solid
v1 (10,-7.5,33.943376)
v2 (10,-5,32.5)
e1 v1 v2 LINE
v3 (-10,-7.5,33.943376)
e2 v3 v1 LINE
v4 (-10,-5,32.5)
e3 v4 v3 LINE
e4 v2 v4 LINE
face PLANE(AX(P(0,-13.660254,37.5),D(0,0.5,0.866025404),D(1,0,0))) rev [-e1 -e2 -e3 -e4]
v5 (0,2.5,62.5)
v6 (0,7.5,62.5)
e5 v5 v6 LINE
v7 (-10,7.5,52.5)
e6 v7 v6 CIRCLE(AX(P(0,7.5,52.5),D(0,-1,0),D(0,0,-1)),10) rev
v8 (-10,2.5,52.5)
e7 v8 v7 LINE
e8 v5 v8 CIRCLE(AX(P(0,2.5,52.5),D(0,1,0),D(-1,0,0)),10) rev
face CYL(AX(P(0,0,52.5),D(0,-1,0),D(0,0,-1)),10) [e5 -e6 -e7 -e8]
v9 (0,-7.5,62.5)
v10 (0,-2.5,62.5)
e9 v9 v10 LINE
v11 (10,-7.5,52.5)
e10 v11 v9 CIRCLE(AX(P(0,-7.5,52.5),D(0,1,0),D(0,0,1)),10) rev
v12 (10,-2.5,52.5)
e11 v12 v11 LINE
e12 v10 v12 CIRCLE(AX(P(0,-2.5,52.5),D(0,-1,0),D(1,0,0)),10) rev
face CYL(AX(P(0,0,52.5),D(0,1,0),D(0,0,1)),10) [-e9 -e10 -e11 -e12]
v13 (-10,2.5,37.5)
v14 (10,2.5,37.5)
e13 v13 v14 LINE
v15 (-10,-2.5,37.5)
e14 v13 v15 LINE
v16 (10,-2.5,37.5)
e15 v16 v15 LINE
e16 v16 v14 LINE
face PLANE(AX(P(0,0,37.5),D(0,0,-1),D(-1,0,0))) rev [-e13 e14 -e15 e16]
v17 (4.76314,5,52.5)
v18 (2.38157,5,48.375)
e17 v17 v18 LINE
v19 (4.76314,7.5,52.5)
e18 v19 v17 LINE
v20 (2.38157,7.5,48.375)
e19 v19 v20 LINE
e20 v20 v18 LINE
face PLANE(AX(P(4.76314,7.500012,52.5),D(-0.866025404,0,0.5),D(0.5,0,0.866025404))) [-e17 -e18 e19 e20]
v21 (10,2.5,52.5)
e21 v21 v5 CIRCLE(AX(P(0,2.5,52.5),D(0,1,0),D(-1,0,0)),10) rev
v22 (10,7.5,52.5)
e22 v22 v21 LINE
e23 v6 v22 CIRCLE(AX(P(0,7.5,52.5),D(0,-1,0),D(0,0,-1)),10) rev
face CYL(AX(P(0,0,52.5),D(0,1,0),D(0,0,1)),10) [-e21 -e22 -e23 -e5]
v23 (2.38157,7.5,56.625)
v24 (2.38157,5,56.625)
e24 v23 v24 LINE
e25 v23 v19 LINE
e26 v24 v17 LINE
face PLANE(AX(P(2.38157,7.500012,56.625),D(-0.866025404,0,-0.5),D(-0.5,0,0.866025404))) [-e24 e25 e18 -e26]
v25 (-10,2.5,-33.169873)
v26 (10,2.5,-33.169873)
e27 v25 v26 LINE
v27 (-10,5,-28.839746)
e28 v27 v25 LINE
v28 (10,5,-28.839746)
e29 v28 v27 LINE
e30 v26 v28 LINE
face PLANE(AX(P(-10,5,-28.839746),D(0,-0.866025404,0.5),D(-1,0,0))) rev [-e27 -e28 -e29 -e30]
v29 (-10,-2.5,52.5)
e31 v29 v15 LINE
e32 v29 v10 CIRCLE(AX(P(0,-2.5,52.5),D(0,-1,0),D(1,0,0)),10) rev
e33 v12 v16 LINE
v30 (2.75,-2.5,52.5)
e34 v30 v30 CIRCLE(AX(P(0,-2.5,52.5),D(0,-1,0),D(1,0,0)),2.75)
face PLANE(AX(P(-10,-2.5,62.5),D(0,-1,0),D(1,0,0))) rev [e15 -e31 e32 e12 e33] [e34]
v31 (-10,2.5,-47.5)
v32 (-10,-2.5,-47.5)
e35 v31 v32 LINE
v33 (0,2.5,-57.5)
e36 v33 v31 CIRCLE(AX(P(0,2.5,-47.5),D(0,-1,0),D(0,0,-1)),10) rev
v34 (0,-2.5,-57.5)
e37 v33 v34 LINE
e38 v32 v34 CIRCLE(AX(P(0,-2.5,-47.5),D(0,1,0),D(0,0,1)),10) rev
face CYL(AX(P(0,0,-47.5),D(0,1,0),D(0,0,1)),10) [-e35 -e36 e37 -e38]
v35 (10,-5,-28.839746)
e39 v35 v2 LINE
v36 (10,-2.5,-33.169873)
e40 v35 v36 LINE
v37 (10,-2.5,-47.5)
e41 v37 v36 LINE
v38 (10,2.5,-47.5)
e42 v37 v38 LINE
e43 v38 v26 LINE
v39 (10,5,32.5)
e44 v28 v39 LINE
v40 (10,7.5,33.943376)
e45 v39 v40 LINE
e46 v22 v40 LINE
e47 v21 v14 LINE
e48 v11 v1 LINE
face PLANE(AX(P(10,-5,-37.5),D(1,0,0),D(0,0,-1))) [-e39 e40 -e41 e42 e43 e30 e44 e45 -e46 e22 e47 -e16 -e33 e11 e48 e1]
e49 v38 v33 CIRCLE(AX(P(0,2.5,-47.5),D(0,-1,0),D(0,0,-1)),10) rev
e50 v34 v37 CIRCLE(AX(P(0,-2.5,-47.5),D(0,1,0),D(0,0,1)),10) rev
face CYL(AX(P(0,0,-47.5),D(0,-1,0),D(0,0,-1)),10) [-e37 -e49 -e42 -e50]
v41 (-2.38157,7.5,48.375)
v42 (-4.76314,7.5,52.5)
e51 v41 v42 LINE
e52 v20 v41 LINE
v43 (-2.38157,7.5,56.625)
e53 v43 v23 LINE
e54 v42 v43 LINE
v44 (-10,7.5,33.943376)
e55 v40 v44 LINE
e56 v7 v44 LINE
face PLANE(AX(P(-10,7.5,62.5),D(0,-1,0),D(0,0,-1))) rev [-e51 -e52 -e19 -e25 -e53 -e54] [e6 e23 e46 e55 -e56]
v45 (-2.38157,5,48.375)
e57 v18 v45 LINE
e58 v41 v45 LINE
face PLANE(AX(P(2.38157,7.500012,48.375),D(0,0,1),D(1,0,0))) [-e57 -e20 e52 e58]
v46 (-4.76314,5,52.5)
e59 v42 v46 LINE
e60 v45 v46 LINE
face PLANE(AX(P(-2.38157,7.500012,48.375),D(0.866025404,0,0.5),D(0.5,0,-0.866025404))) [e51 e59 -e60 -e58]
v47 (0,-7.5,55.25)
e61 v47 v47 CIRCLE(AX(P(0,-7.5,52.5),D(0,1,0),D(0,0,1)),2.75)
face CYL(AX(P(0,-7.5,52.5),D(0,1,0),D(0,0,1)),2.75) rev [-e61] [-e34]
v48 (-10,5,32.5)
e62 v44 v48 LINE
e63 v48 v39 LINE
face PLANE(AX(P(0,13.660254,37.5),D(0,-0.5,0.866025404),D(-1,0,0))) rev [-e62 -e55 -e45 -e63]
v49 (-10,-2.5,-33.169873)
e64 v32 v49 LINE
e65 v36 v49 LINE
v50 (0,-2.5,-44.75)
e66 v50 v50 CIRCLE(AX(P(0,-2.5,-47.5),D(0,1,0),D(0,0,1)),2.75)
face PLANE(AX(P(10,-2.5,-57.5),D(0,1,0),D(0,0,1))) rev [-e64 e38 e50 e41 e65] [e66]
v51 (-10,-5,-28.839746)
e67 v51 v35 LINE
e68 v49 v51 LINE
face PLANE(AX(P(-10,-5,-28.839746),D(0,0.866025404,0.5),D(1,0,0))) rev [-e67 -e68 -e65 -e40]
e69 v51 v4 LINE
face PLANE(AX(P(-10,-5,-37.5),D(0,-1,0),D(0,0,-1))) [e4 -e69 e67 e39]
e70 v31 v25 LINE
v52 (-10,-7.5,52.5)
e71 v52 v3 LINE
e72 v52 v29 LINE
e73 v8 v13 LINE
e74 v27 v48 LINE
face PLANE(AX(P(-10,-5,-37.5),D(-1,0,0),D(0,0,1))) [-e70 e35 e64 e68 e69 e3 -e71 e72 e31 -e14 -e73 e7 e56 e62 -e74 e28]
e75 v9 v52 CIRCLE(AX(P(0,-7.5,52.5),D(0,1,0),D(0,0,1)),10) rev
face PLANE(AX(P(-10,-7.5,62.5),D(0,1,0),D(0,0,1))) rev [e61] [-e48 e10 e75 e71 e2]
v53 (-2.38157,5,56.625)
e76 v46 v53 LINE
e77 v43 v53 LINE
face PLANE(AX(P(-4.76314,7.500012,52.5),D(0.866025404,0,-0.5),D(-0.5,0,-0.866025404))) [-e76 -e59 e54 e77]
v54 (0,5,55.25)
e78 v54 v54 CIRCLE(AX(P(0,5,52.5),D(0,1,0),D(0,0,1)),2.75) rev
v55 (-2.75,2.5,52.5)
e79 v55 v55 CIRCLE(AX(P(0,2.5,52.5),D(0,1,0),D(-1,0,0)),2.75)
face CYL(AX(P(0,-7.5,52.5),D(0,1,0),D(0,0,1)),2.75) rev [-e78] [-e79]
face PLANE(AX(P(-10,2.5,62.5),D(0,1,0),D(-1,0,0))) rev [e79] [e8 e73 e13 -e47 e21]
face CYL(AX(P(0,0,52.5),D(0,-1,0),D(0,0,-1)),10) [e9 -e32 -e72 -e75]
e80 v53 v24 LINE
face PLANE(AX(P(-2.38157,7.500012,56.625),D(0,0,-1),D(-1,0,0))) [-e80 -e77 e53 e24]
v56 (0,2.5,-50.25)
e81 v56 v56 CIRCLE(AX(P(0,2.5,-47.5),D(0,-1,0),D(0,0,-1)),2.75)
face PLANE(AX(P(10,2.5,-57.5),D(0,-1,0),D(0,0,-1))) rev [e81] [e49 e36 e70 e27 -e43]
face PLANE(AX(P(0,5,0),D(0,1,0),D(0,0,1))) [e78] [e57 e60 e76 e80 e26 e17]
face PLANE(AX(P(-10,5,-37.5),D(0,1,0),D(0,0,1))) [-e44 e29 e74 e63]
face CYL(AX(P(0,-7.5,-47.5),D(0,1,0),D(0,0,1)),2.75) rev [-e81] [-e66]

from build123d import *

# Parameters (mm, degrees)
BOSS_EXTRUDE1_DEPTH      = 37.5
BOSS_EXTRUDE1_DEPTH_BACK = 37.5
SKETCH1_W                = 20
SKETCH1_H                = 10
SKETCH3_W                = 20
SKETCH3_H                = 5
BOSS_EXTRUDE2_DEPTH      = 20
FILLET1_R                = 10
SKETCH5_W                = 20
SKETCH5_H                = 5
BOSS_EXTRUDE3_DEPTH      = 25
CHAMFER1_SIZE            = 5
CHAMFER1_SIZE_2          = 8.660254038
FILLET2_R                = 10
CUT_EXTRUDE1_DEPTH       = 65.08002809
CUT_EXTRUDE1_DEPTH_BACK  = 65.08002809
SKETCH4_R                = 2.75
CUT_EXTRUDE2_DEPTH       = 66.048059156
CUT_EXTRUDE2_DEPTH_BACK  = 2.5


# Some blends are built 0.0001 mm under size
with BuildPart() as part:
    # Sketch1 → Boss-Extrude1 (new, two sides: drawn at the far end of the back side and taken through both)
    with BuildSketch(Plane.XY.offset(-BOSS_EXTRUDE1_DEPTH_BACK)):
        Rectangle(SKETCH1_W, SKETCH1_H)
    extrude(amount=BOSS_EXTRUDE1_DEPTH + BOSS_EXTRUDE1_DEPTH_BACK)

    # Sketch3 → Boss-Extrude2 (add)
    with BuildSketch(Plane(origin=(0, 0, -37.5), x_dir=(-1, 0, 0), z_dir=(0, 0, -1))):
        Rectangle(SKETCH3_W, SKETCH3_H)
    extrude(amount=BOSS_EXTRUDE2_DEPTH)

    # Fillet1
    fillet1_edges = [part.edges().sort_by_distance(p)[0] for p in [
        (-10, 0, -57.5),
        (10, 0, -57.5),
    ]]
    fillet(fillet1_edges, radius=FILLET1_R - 0.0001)  # a hair under: the kernel refuses the full size

    # Sketch5 → Boss-Extrude3 (add)
    with BuildSketch(Plane.XY.offset(37.5)):
        with Locations((0, 5)):
            Rectangle(SKETCH5_W, SKETCH5_H)
        with Locations((0, -5)):
            Rectangle(SKETCH5_W, SKETCH5_H)
    extrude(amount=BOSS_EXTRUDE3_DEPTH)

    # Chamfer1
    # the kernel refuses this chamfer: 8.660254038, 5 mm, written as the material it adds along each edge
    with BuildSketch(Plane(origin=(10, 5, 37.5), x_dir=(0, -0.05789386240267149, -0.9983227437537926), z_dir=(-1, 0, 0))) as chamfer1_piece_1_section:
        Polygon((CHAMFER1_SIZE * 0.998322743754, -CHAMFER1_SIZE * 0.0578938624027), (-CHAMFER1_SIZE_2 * 0.0578938624016, -CHAMFER1_SIZE_2 * 0.998322743736), (0, 0), align=None)
    chamfer1_piece_1 = extrude(amount=20, mode=Mode.PRIVATE)
    chamfer1_piece_1 = split(chamfer1_piece_1, bisect_by=Plane(origin=(0, 7.5, 35.327003025), z_dir=(0, -1, 0)), keep=Keep.TOP, mode=Mode.PRIVATE)
    add(chamfer1_piece_1)
    with BuildSketch(Plane(origin=(-10, -5, 37.5), x_dir=(0, 0.05789386240267149, -0.9983227437537926), z_dir=(1, 0, 0))) as chamfer1_piece_2_section:
        Polygon((CHAMFER1_SIZE * 0.998322743754, -CHAMFER1_SIZE * 0.0578938624027), (-CHAMFER1_SIZE_2 * 0.0578938624016, -CHAMFER1_SIZE_2 * 0.998322743736), (0, 0), align=None)
    chamfer1_piece_2 = extrude(amount=20, mode=Mode.PRIVATE)
    chamfer1_piece_2 = split(chamfer1_piece_2, bisect_by=Plane(origin=(0, -7.5, 35.327003025), z_dir=(0, 1, 0)), keep=Keep.TOP, mode=Mode.PRIVATE)
    add(chamfer1_piece_2)
    # the kernel refuses this chamfer: 8.660254038, 5 mm, written as the material it takes off along each edge
    with BuildSketch(Plane(origin=(32.404819853, 5, -37.5), x_dir=(0, 0.019326765612700598, 0.9998132206222078), z_dir=(-1, 0, 0))) as chamfer1_2_piece_1_section:
        Polygon((CHAMFER1_SIZE_2 * 0.999813220604, -CHAMFER1_SIZE_2 * 0.0193267656124), (-CHAMFER1_SIZE * 0.0193267656127, -CHAMFER1_SIZE * 0.999813220622), (0, 0), align=None)
    chamfer1_2_piece_1 = extrude(amount=64.809639706, mode=Mode.PRIVATE)
    chamfer1_2_piece_1 = split(chamfer1_2_piece_1, bisect_by=Plane(origin=(0, 2.5, -34.039331058), z_dir=(0, 1, 0)), keep=Keep.TOP, mode=Mode.PRIVATE)
    add(chamfer1_2_piece_1, mode=Mode.SUBTRACT)
    with BuildSketch(Plane(origin=(-32.404819853, -5, -37.5), x_dir=(0, 0.9983227437537926, -0.057893862402671824), z_dir=(1, 0, 0))) as chamfer1_2_piece_2_section:
        Polygon((CHAMFER1_SIZE * 0.998322743754, CHAMFER1_SIZE * 0.0578938624027), (-CHAMFER1_SIZE_2 * 0.0578938624016, CHAMFER1_SIZE_2 * 0.998322743736), (0, 0), align=None)
    chamfer1_2_piece_2 = extrude(amount=64.809639706, mode=Mode.PRIVATE)
    chamfer1_2_piece_2 = split(chamfer1_2_piece_2, bisect_by=Plane(origin=(0, -2.5, -34.039331058), z_dir=(0, -1, 0)), keep=Keep.TOP, mode=Mode.PRIVATE)
    add(chamfer1_2_piece_2, mode=Mode.SUBTRACT)

    # Fillet2
    fillet2_edges = [part.edges().sort_by_distance(p)[0] for p in [
        (-10, -5, 62.5),
        (-10, 5, 62.5),
        (10, -5, 62.5),
        (10, 5, 62.5),
    ]]
    fillet(fillet2_edges, radius=FILLET2_R - 0.0001)  # a hair under: the kernel refuses the full size

    # Sketch4 → Cut-Extrude1 (cut, two sides: drawn at the far end of the back side and taken through both)
    with BuildSketch(Plane(origin=(0, 2.5, 0), x_dir=(1, 0, 0), z_dir=(0, 1, 0)).offset(-CUT_EXTRUDE1_DEPTH_BACK)):
        with Locations(Location((0, 47.5, 0), (0, 0, 270))):
            Circle(SKETCH4_R)
        with Locations(Location((0, -52.5, 0), (0, 0, 270))):
            Circle(SKETCH4_R)
    extrude(amount=CUT_EXTRUDE1_DEPTH + CUT_EXTRUDE1_DEPTH_BACK, mode=Mode.SUBTRACT)

    # Sketch6 → Cut-Extrude2 (cut, two sides: drawn at the far end of the back side and taken through both)
    with BuildSketch(Plane(origin=(0, 7.5, 0), x_dir=(1, 0, 0), z_dir=(0, 1, 0)).offset(-CUT_EXTRUDE2_DEPTH_BACK)):
        Polygon((-2.38156986, -48.375), (-4.763139721, -52.5), (-2.38156986, -56.625), (2.38156986, -56.625), (4.763139721, -52.5), (2.38156986, -48.375), align=None)
    extrude(amount=CUT_EXTRUDE2_DEPTH + CUT_EXTRUDE2_DEPTH_BACK, mode=Mode.SUBTRACT)


solid = part.part
